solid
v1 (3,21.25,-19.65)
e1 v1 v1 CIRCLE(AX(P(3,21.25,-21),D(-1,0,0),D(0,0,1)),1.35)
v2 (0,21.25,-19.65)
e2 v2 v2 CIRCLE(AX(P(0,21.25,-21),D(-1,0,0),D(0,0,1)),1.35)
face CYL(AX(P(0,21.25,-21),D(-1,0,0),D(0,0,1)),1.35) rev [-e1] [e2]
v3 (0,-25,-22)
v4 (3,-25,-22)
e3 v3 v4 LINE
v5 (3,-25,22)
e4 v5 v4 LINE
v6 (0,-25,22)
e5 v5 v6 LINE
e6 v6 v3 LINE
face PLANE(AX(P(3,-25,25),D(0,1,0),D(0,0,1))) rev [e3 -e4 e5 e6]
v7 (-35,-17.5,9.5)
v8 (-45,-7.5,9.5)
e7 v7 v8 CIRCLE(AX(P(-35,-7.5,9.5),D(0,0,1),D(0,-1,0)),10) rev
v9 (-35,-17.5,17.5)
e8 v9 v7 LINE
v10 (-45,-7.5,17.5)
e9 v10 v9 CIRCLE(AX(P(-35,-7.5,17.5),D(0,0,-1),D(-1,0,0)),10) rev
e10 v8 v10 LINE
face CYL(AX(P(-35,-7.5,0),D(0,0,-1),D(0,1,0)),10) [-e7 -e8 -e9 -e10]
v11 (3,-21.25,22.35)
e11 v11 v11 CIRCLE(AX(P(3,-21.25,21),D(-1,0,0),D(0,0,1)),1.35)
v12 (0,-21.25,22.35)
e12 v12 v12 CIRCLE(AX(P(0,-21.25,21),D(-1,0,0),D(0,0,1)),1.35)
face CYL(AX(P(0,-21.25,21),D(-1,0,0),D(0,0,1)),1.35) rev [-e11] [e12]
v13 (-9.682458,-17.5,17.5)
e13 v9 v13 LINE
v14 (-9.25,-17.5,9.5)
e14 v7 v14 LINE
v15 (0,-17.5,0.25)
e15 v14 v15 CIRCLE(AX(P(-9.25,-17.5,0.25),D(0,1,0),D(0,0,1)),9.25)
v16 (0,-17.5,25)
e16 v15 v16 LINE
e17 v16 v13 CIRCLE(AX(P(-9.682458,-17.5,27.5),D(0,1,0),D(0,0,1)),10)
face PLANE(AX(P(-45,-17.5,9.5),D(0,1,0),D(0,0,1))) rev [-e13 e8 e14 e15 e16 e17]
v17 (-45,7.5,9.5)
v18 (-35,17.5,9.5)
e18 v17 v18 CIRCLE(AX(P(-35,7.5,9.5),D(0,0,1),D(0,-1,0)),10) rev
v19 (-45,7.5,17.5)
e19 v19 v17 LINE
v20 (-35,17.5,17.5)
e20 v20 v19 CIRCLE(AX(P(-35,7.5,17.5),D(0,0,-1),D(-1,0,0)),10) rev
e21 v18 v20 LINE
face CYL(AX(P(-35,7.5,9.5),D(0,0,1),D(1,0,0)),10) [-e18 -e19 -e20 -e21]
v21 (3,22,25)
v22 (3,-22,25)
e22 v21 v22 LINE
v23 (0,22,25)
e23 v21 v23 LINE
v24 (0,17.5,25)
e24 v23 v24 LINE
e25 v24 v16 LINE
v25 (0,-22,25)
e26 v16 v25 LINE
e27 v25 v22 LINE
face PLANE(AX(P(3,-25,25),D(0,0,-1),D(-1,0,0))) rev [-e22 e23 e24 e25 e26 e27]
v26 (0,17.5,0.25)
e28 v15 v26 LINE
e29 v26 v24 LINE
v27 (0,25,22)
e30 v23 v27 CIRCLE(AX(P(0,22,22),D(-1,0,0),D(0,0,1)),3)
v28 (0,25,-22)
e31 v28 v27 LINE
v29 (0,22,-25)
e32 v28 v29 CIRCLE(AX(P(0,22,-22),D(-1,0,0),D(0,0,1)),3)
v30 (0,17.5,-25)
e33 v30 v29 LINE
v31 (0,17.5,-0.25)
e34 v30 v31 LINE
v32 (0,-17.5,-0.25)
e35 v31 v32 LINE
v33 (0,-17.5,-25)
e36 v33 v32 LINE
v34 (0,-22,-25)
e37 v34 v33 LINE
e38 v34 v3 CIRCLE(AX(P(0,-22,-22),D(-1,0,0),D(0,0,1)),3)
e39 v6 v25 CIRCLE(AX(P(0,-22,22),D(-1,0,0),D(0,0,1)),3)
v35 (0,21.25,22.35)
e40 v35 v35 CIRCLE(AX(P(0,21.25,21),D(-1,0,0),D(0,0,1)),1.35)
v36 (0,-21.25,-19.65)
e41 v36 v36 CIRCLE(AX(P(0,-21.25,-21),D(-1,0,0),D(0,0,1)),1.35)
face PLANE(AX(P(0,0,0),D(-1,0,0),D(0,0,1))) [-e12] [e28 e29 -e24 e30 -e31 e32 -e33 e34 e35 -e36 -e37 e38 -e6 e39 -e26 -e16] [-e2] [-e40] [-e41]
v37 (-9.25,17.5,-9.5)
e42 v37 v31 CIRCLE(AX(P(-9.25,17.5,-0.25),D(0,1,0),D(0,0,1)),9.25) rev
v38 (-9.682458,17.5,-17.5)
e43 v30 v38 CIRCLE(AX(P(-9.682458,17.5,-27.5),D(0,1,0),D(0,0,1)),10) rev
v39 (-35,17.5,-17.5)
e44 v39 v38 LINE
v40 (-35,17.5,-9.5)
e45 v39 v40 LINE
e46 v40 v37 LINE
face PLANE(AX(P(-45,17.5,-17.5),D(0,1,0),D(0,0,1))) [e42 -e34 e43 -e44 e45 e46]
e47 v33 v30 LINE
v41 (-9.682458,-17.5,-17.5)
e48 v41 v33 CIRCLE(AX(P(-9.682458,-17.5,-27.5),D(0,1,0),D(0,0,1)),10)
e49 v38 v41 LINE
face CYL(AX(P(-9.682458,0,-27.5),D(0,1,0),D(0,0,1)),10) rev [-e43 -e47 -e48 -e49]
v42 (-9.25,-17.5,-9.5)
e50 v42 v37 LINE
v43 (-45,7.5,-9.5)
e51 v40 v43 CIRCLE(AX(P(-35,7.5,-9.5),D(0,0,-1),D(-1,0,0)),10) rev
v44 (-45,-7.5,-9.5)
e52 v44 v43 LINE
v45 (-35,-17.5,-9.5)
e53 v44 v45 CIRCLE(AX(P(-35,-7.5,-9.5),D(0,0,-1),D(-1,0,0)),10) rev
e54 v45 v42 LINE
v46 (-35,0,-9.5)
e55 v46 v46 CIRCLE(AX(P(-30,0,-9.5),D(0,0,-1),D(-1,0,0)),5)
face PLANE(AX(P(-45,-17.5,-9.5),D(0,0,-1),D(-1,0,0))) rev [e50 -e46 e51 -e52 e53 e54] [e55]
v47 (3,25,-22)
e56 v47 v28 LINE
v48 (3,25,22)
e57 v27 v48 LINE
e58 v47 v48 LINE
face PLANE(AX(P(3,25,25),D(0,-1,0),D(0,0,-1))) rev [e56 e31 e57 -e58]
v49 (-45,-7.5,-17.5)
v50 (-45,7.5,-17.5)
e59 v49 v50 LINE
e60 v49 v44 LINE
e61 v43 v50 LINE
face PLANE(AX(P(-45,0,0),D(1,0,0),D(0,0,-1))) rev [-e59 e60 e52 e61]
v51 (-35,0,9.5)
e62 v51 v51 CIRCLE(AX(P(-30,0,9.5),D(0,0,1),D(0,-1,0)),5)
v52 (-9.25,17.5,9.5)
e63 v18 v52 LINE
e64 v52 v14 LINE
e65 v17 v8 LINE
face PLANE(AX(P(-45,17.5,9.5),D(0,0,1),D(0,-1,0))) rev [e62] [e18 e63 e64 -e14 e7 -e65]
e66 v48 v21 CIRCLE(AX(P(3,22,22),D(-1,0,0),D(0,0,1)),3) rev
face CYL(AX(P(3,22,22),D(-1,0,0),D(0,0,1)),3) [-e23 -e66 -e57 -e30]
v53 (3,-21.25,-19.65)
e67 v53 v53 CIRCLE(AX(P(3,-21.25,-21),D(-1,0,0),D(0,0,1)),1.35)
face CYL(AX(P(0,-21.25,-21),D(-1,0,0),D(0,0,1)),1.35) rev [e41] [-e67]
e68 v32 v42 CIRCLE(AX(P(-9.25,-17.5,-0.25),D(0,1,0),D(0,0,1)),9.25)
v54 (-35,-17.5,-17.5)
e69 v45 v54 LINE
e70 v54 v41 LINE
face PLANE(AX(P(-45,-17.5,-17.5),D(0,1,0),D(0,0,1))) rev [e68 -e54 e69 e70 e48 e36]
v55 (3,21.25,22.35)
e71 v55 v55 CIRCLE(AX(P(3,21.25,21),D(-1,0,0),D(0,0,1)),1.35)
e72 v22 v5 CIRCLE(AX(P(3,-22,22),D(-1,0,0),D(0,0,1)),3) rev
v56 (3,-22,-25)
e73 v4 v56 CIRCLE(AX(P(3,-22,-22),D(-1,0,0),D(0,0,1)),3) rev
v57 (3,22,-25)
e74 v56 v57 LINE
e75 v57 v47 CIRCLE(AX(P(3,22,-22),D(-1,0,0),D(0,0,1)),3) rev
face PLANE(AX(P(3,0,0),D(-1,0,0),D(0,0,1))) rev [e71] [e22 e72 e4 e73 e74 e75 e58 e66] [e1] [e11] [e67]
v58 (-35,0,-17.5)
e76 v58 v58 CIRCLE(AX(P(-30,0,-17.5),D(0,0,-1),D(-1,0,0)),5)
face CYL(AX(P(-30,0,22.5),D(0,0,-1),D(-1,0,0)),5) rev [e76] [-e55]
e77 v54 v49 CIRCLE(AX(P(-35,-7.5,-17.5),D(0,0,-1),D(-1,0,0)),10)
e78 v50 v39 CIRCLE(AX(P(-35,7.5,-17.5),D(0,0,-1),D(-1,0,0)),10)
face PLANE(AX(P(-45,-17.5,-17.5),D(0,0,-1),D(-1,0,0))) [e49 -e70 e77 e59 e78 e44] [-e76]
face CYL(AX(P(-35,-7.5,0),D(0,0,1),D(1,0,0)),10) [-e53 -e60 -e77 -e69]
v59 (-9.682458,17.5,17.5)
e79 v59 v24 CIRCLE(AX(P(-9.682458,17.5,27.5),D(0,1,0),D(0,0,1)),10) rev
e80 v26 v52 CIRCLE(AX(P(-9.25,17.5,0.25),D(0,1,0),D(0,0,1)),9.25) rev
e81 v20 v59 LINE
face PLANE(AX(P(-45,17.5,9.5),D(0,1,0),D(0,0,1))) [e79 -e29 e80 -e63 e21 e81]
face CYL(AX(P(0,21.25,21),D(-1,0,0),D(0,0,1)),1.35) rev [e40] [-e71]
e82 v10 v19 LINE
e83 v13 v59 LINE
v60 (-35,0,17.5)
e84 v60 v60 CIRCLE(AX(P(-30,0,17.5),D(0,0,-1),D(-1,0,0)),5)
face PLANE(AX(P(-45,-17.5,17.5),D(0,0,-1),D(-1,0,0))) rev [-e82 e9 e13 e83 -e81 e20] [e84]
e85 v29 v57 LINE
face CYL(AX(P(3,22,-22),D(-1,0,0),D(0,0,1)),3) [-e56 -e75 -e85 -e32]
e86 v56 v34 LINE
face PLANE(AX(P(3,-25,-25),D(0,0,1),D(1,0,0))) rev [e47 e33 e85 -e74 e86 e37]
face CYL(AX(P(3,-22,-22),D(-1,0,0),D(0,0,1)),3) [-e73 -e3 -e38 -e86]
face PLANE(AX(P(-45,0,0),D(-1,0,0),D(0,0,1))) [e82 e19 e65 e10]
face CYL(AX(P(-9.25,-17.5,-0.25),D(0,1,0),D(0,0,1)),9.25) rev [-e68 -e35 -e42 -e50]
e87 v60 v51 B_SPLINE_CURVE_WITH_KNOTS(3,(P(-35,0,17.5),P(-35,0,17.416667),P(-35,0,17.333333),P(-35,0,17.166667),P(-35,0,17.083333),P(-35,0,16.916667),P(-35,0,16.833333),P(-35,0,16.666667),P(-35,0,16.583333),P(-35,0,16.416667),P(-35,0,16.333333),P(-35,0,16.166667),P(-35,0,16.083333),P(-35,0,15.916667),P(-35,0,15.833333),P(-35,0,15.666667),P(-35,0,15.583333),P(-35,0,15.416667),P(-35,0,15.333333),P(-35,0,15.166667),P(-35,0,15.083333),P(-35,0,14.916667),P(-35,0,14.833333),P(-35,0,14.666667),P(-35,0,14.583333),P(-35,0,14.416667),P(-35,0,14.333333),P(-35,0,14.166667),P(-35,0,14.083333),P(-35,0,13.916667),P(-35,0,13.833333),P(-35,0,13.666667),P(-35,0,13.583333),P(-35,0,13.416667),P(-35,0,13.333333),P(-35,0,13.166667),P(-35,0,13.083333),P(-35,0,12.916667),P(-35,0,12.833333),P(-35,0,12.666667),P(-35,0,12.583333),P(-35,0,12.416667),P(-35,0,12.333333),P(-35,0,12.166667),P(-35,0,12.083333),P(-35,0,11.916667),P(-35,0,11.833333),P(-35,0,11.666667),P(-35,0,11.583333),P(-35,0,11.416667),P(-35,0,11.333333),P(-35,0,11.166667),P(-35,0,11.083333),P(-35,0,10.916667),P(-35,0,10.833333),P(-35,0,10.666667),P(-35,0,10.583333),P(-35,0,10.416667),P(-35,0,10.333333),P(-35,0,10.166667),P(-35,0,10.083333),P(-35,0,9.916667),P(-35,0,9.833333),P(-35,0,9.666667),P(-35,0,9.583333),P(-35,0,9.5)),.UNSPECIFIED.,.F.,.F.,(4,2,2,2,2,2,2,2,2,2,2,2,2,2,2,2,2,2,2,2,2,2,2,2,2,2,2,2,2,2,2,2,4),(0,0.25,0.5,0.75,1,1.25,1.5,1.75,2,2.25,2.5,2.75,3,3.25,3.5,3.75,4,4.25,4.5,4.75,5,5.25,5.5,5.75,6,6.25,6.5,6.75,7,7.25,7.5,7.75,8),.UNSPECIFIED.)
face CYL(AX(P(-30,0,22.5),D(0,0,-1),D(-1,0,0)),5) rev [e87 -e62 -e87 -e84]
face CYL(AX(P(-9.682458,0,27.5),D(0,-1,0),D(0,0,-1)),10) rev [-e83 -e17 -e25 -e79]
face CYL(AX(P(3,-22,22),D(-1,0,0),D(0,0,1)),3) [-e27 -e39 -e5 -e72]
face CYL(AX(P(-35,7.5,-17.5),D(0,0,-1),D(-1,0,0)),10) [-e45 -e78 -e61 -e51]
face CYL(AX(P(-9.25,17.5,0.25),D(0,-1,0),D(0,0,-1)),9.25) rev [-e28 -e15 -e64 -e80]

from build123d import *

# Parameters (mm, degrees)
ESQUISSE3_W             = 50
ESQUISSE3_H             = 50
BOSS_EXTRU_3_DEPTH      = 3
ESQUISSE4_W             = 8
ESQUISSE4_H             = 35
BOSS_EXTRU_5_DEPTH      = 45
ESQUISSE7_R             = 5
ENL_V_MAT_EXTRU_1_DEPTH = 40
CONG_1_R                = 10
CONG_2_R                = 9.25
CONG_3_R                = 3
D_GAGEMENT_M2_51_D      = 2.7


with BuildPart() as part:
    # Esquisse3 → Boss.-Extru.3 (new body)
    with BuildSketch(Plane(origin=(0, 0, 0), x_dir=(0, 0, -1), z_dir=(1, 0, 0))):
        Rectangle(ESQUISSE3_W, ESQUISSE3_H)
    extrude(amount=BOSS_EXTRU_3_DEPTH)

    # Esquisse4 → Boss.-Extru.5 (add)
    with BuildSketch(Plane(origin=(0, 0, 0), x_dir=(0, 0, -1), z_dir=(1, 0, 0))):
        with Locations((-13.5, 0)):
            Rectangle(ESQUISSE4_W, ESQUISSE4_H)
        with Locations((13.5, 0)):
            Rectangle(ESQUISSE4_W, ESQUISSE4_H)
    extrude(amount=-BOSS_EXTRU_5_DEPTH)

    # Esquisse7 → Enlèv. mat.-Extru.1 (cut)
    with BuildSketch(Plane(origin=(0, 0, -17.5), x_dir=(-1, 0, 0), z_dir=(0, 0, -1))):
        with Locations((30, 0)):
            Circle(ESQUISSE7_R)
    extrude(amount=-ENL_V_MAT_EXTRU_1_DEPTH, mode=Mode.SUBTRACT)

    # Congé1
    # the kernel refuses this fillet: 10 mm, written as the material it adds along each edge
    with BuildSketch(Plane(origin=(0, -17.5, 17.5), x_dir=(0, 0, 1), z_dir=(0, 1, 0))) as cong_1_piece_1:
        with BuildLine():
            CenterArc((10, -9.682458366), CONG_1_R, 104.477512186, 75.522487814)
            Line((0, -9.682458366), (0, 0))
            Line((0, 0), (7.5, 0))
        make_face()
    extrude(amount=35)
    with BuildSketch(Plane(origin=(0, -17.5, -17.5), x_dir=(0, 0, -1), z_dir=(0, 1, 0))) as cong_1_piece_2:
        with BuildLine():
            CenterArc((10, 9.682458366), CONG_1_R, 180, 75.522487814)
            Line((0, 9.682458366), (0, 0))
            Line((0, 0), (7.5, 0))
        make_face()
    extrude(amount=35)
    # the kernel refuses this fillet: 10 mm, written as the material it takes off along each edge
    with BuildSketch(Plane(origin=(-45, 17.5, 42.5), x_dir=(0, -1, 0), z_dir=(0, 0, -1)), Plane(origin=(-45, 17.5, -42.5), x_dir=(1, 0, 0), z_dir=(0, 0, 1))) as cong_1_2_piece_1:
        with BuildLine():
            CenterArc((CONG_1_R, -CONG_1_R), CONG_1_R, 90, 90)
            Line((0, -CONG_1_R), (0, 0))
            Line((0, 0), (CONG_1_R, 0))
        make_face()
    extrude(amount=58, mode=Mode.SUBTRACT)
    with BuildSketch(Plane(origin=(-45, -17.5, -15.5), x_dir=(1, 0, 0), z_dir=(0, 0, 1)), Plane(origin=(-45, -17.5, 15.5), x_dir=(0, 1, 0), z_dir=(0, 0, -1))) as cong_1_2_piece_2:
        with BuildLine():
            CenterArc((CONG_1_R, CONG_1_R), CONG_1_R, 180, 90)
            Line((0, CONG_1_R), (0, 0))
            Line((0, 0), (CONG_1_R, 0))
        make_face()
    extrude(amount=58, mode=Mode.SUBTRACT)

    # Congé2
    cong_2_edges = [part.edges().sort_by_distance(p)[0] for p in [
        (0, 0, 9.5),
        (0, 0, -9.5),
    ]]
    fillet(cong_2_edges, radius=CONG_2_R)

    # Congé3
    cong_3_edges = [part.edges().sort_by_distance(p)[0] for p in [
        (1.5, -25, -25),
        (1.5, -25, 25),
        (1.5, 25, 25),
        (1.5, 25, -25),
    ]]
    fillet(cong_3_edges, radius=CONG_3_R)

    # Dégagement M2.51 (through all)
    with Locations(Plane.ZY):
        with Locations((21, 21.25), (-21, 21.25), (-21, -21.25), (21, -21.25)):
            Hole(D_GAGEMENT_M2_51_D / 2)


solid = part.part
